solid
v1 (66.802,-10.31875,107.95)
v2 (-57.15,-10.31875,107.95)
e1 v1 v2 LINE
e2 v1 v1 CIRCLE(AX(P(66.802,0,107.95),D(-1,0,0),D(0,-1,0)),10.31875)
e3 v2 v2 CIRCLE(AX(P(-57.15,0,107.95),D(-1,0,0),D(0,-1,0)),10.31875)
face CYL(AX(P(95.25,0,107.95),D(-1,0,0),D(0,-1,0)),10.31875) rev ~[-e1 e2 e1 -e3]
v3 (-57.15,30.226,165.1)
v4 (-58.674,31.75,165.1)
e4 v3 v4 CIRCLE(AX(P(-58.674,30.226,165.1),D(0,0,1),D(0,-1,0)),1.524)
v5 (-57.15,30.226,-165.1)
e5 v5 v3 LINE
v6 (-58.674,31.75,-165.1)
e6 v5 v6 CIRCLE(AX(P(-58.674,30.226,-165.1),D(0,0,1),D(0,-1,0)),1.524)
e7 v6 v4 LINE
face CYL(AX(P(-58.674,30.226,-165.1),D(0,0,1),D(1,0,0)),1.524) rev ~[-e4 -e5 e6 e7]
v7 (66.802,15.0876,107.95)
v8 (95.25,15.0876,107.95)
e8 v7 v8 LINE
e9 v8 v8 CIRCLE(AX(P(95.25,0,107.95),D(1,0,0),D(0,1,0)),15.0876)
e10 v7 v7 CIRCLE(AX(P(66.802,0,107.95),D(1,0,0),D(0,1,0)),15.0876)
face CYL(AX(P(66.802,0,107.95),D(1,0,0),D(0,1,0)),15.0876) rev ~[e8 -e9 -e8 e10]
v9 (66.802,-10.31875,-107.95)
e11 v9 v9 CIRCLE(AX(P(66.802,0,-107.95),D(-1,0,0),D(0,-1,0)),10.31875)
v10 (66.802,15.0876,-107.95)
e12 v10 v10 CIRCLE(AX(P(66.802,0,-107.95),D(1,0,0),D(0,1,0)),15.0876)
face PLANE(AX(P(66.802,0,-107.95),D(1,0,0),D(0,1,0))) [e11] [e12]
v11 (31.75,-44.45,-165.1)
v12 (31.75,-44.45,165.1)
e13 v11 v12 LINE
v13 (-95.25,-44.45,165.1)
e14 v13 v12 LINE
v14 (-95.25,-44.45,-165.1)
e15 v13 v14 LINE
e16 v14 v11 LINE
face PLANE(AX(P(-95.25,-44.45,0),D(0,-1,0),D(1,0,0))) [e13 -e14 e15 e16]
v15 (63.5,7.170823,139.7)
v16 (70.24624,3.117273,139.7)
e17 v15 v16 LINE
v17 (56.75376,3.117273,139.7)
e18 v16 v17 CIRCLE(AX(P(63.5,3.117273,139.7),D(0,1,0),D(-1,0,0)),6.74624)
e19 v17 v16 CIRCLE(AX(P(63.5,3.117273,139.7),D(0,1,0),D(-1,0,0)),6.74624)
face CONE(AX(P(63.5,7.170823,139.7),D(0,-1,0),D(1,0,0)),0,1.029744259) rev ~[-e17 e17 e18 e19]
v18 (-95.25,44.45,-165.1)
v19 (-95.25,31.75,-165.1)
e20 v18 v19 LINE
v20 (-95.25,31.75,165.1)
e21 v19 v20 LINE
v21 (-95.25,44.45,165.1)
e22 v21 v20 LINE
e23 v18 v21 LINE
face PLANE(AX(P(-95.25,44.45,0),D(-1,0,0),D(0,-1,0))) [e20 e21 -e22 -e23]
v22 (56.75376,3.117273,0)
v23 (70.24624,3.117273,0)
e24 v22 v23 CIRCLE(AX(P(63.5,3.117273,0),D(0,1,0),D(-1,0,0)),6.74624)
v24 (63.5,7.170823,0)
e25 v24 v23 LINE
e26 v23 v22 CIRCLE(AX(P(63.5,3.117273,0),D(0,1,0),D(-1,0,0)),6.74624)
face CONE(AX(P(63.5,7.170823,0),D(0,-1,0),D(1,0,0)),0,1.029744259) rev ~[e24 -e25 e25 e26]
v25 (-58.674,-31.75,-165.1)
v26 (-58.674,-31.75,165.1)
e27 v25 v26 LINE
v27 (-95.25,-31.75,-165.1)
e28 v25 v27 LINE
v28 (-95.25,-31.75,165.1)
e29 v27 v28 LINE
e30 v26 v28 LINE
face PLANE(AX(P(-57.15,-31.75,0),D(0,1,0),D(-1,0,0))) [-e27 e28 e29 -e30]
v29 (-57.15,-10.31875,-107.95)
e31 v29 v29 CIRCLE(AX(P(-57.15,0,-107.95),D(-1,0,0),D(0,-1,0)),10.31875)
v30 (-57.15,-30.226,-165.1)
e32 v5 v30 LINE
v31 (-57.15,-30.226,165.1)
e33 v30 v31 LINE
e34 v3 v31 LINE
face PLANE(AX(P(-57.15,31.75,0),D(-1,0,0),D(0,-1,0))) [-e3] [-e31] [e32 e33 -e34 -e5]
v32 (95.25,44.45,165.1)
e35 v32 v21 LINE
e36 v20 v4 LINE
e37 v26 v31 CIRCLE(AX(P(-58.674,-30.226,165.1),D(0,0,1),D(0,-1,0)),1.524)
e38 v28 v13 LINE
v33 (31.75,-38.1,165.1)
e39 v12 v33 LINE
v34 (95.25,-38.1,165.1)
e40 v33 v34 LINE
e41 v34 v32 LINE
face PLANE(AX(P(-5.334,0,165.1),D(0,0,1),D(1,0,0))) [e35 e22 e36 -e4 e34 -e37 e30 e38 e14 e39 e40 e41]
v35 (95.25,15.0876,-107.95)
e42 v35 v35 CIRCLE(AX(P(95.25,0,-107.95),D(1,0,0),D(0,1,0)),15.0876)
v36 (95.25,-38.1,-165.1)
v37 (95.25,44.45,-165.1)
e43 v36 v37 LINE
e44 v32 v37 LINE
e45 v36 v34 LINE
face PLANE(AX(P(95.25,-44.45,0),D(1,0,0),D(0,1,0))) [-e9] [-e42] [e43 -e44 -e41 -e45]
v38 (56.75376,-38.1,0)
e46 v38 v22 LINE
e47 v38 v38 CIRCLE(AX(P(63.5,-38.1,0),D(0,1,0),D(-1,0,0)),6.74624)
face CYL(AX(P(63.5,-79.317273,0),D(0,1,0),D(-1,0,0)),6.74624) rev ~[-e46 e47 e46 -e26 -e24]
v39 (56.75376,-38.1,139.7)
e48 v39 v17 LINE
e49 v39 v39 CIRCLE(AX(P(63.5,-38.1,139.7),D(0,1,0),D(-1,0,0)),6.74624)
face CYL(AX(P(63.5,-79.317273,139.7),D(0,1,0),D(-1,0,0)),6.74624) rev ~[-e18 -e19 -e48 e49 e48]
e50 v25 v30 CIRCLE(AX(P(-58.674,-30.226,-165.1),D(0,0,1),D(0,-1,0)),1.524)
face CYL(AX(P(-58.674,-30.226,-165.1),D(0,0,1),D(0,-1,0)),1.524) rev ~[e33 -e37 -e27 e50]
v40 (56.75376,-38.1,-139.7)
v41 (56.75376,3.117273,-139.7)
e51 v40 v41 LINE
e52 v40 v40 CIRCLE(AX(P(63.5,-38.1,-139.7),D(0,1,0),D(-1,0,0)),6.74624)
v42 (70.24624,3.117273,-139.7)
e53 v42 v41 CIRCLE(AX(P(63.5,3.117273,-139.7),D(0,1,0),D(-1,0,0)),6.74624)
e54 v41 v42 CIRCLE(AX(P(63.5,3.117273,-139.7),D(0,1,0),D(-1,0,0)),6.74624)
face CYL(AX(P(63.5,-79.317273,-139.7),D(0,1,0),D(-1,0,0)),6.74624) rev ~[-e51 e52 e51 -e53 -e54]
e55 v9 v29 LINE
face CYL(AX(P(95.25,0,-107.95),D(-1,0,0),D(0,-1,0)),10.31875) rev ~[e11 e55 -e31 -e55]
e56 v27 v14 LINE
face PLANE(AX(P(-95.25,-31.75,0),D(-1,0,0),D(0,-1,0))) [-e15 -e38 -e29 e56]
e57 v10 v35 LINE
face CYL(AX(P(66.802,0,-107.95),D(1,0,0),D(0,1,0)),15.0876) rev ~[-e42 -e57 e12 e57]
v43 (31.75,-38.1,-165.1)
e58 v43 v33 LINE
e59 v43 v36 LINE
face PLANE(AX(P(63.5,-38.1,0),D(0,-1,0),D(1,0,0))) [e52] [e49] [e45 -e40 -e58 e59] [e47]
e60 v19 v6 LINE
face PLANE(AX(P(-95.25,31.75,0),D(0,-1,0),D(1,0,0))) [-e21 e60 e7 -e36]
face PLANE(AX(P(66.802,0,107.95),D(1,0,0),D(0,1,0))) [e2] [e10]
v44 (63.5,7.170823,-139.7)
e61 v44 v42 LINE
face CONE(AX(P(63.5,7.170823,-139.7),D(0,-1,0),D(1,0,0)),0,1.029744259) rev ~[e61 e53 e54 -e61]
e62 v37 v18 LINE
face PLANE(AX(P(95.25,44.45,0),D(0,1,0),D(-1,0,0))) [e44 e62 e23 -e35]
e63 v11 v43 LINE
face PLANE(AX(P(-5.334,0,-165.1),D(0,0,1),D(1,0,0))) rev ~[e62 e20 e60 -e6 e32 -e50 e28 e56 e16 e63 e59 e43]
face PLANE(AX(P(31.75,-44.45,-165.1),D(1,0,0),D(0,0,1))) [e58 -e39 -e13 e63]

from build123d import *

# Parameters (mm, degrees)
F1_DEPTH       = 165.1
F2_R           = 1.524
F4_D           = 20.6375
F4_CBORE_D     = 30.1752
F4_CBORE_DEPTH = 28.448
F5_W           = 63.5
F5_H           = 330.2
F6_DEPTH       = 6.35
F8_D           = 13.49248
F8_DEPTH       = 41.2172727273
F8_TIP         = 4.0535499425


# Not quite as in the source:
# - a length typed as a fraction of an inch, garbled in the dataset ("3 / 203.2 mm" for 3/8 in), is restored


with BuildPart() as f1:
    # F0 (on Top) → F1 (new body, symmetric)
    with BuildSketch(Plane.XY):
        Polygon((95.25, 44.45), (-95.25, 44.45), (-95.25, 31.75), (-57.15, 31.75), (-57.15, -31.75), (-95.25, -31.75), (-95.25, -44.45), (95.25, -44.45), align=None)
    extrude(amount=F1_DEPTH, both=True)

    # F2
    f2_edges = [f1.edges().sort_by_distance(p)[0] for p in [
        (-57.15, 31.75, 0),
        (-57.15, -31.75, 0),
    ]]
    fillet(f2_edges, radius=F2_R)

    # F4 (through all)
    with Locations(Plane.YZ.offset(95.25)):
        with Locations((0, 107.95), (0, -107.95)):
            CounterBoreHole(F4_D / 2, F4_CBORE_D / 2, F4_CBORE_DEPTH)

    # F5 (on face) → F6 (cut)
    with BuildSketch(Plane.XZ.offset(44.45)):
        with Locations((63.5, 0)):
            Rectangle(F5_W, F5_H)
    extrude(amount=-F6_DEPTH, mode=Mode.SUBTRACT)

    # F8
    with Locations(Plane.XZ.offset(38.1)):
        with Locations((63.5, 139.7), (63.5, 0), (63.5, -139.7)):
            Hole(F8_D / 2, depth=F8_DEPTH)
            with Locations((0, 0, -(F8_DEPTH + F8_TIP / 2))):  # 118° drill point
                Cone(0, F8_D / 2, F8_TIP, mode=Mode.SUBTRACT)


solid = f1.part
